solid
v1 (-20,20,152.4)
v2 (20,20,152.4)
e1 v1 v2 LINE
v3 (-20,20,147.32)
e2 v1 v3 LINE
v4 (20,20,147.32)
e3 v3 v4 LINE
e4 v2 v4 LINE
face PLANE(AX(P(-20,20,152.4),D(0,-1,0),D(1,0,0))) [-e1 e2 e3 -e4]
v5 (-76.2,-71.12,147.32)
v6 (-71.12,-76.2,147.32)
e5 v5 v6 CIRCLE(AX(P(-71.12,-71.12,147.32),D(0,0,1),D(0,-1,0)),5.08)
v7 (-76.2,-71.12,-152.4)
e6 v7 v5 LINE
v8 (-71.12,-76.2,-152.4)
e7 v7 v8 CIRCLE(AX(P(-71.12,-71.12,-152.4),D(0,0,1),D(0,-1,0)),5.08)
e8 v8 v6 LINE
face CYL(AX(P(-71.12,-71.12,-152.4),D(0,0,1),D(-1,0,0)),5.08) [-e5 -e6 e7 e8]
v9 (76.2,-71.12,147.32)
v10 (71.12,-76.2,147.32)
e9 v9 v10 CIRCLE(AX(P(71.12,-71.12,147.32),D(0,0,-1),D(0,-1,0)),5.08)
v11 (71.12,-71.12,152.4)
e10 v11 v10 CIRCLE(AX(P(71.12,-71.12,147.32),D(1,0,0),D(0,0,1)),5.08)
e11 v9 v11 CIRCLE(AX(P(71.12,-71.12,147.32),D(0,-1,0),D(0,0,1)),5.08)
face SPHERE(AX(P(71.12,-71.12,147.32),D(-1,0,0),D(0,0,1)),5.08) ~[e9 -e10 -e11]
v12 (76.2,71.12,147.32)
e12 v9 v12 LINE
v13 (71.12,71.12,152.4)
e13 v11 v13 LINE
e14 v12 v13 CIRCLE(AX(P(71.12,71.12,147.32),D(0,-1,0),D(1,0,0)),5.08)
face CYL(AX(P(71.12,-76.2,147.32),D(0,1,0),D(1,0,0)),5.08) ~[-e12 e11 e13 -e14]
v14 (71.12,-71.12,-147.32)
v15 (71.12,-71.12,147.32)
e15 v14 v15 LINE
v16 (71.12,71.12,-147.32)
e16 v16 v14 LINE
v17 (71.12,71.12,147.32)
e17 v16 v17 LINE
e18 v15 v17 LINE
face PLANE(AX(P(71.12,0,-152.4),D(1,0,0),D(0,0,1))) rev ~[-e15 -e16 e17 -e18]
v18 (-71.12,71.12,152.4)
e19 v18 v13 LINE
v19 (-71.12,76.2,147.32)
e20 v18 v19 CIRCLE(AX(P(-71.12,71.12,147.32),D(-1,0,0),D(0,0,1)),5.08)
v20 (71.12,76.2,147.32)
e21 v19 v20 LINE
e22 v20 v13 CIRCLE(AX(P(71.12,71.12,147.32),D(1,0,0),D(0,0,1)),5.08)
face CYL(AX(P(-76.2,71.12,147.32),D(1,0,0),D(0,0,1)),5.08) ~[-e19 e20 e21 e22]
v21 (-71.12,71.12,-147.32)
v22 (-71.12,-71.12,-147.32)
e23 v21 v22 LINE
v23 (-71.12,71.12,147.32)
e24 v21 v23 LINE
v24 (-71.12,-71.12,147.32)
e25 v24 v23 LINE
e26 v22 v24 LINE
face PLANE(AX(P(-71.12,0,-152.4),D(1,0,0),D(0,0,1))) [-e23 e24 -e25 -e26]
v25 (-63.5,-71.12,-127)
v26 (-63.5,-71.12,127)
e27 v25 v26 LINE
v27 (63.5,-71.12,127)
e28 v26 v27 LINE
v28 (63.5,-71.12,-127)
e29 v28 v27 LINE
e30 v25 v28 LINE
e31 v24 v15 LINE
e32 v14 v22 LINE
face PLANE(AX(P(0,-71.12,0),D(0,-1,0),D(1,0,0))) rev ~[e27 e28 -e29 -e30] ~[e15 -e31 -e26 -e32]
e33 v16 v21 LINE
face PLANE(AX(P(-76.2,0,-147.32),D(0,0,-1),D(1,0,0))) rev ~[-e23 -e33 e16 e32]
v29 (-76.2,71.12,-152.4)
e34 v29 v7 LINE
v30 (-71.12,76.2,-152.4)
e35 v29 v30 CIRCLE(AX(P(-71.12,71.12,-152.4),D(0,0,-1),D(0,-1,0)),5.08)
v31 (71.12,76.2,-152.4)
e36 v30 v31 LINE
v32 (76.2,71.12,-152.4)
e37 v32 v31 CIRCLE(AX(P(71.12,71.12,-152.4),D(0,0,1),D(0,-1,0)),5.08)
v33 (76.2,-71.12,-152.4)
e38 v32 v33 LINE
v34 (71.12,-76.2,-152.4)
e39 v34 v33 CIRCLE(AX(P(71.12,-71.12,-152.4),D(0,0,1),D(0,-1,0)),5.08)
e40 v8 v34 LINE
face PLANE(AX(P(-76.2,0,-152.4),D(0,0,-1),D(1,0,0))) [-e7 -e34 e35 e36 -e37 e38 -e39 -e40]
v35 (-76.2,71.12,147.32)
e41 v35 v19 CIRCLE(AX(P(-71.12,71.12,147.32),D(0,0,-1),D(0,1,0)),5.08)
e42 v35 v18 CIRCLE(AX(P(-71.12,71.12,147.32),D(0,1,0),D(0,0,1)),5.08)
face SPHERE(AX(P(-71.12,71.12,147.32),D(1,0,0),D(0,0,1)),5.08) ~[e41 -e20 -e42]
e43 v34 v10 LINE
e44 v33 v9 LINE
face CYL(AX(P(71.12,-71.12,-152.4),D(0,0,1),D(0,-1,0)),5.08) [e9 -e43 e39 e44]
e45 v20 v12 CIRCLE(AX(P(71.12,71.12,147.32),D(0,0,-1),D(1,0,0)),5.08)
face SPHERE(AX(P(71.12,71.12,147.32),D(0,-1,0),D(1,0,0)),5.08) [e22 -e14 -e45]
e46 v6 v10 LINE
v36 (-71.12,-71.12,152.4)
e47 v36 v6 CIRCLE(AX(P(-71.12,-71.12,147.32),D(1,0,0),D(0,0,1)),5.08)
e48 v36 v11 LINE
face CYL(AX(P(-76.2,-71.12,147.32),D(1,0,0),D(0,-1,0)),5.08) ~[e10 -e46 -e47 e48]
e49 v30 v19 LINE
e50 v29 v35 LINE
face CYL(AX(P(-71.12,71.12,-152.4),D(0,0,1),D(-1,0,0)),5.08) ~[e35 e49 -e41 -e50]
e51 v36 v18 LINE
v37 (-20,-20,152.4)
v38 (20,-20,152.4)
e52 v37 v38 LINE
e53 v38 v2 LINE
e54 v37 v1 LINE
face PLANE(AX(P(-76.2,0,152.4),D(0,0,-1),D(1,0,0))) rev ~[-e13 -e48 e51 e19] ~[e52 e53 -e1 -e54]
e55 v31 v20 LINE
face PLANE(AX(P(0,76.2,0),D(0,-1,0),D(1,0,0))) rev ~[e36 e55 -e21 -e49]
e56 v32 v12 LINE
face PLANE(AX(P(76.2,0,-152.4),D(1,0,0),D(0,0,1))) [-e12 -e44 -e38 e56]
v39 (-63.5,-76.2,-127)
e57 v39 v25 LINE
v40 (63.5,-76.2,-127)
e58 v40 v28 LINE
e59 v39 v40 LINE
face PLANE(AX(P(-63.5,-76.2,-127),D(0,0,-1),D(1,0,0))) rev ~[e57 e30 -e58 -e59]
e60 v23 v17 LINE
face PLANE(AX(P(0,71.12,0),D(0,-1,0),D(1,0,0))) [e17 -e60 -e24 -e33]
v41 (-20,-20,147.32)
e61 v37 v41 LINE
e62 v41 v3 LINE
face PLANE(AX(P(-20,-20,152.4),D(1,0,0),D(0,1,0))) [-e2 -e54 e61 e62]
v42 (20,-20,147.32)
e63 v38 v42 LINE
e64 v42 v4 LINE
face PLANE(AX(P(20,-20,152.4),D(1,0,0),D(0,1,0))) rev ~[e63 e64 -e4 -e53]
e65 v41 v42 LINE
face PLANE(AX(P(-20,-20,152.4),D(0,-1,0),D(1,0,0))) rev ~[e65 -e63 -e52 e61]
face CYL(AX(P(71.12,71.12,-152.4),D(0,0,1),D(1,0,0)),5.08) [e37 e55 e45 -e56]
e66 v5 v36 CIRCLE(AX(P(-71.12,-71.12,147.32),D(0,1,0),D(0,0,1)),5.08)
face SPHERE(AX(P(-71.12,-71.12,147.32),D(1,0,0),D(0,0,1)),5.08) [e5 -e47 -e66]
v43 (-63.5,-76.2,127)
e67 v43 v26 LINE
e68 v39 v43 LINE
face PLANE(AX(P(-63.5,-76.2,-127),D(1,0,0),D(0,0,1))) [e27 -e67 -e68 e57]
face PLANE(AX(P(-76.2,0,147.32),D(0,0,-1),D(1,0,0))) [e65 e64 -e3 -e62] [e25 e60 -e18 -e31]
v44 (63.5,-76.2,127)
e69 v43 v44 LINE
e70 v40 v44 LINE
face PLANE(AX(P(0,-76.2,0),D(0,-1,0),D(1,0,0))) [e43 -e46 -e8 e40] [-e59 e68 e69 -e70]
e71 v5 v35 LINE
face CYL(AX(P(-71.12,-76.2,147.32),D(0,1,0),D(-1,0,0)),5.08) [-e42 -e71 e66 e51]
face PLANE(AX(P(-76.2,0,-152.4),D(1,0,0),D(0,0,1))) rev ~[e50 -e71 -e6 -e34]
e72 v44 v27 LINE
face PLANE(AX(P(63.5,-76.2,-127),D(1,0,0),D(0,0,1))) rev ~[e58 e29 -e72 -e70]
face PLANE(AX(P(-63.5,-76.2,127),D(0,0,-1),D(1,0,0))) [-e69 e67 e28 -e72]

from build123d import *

# Parameters (mm, degrees)
F0_W     = 152.4
F0_H     = 304.8
F1_DEPTH = 76.2
F2_R     = 5.08
F3_T     = 5.08
F4_W     = 127
F4_H     = 254
F5_DEPTH = 25.4
F6_W     = 40
F6_H     = 40
F7_DEPTH = 5.08


# Not quite as in the source:
# - a shell that OpenCascade refuses in one call is made with other operations: the cavity is built on its own and cut out


with BuildPart() as f1:
    # F0 (on Front) → F1 (new body, symmetric)
    with BuildSketch(Plane.XZ):
        Rectangle(F0_W, F0_H)
    extrude(amount=F1_DEPTH, both=True)

    # F2
    f2_edges = [f1.edges().sort_by_distance(p)[0] for p in [
        (0, -76.2, 152.4),
        (76.2, 0, 152.4),
        (76.2, -76.2, 0),
        (76.2, 76.2, 0),
        (0, 76.2, 152.4),
        (-76.2, 0, 152.4),
        (-76.2, -76.2, 0),
        (-76.2, 76.2, 0),
    ]]
    fillet(f2_edges, radius=F2_R)

    # F3: shell of thickness 5.08, made by hand


with BuildPart() as f3_core1:
    # F3_t2: copy of F1
    add(f1.part)

    # the walls: a layer under each face that stays
    f3_faces = [f3_core1.faces().sort_by_distance(p)[0] for p in [
        (0, 0, -152.4),
        (0, 76.2, -2.54),
        (-76.2, 0, -2.54),
        (76.2, 0, -2.54),
        (0, -76.2, -2.54),
        (0, 0, 152.4),
    ]]
    thicken(f3_faces, amount=-F3_T, mode=Mode.SUBTRACT)


with BuildPart() as f1_1:
    add(f1.part)

    # what is left inside the walls is the cavity
    f3_cavity = [f3_core1.part.solids().sort_by_distance(p)[0] for p in [
        (-71.0692, 23.706667, 0),
    ]]
    add(f3_cavity, mode=Mode.SUBTRACT)

    # F4 (on face) → F5 (cut)
    with BuildSketch(Plane.XZ.offset(76.2)):
        Rectangle(F4_W, F4_H)
    extrude(amount=-F5_DEPTH, mode=Mode.SUBTRACT)

    # F6 (on face) → F7 (cut)
    with BuildSketch(Plane.XY.offset(152.4)):
        Rectangle(F6_W, F6_H)
    extrude(amount=-F7_DEPTH, mode=Mode.SUBTRACT)


solid = f1_1.part
